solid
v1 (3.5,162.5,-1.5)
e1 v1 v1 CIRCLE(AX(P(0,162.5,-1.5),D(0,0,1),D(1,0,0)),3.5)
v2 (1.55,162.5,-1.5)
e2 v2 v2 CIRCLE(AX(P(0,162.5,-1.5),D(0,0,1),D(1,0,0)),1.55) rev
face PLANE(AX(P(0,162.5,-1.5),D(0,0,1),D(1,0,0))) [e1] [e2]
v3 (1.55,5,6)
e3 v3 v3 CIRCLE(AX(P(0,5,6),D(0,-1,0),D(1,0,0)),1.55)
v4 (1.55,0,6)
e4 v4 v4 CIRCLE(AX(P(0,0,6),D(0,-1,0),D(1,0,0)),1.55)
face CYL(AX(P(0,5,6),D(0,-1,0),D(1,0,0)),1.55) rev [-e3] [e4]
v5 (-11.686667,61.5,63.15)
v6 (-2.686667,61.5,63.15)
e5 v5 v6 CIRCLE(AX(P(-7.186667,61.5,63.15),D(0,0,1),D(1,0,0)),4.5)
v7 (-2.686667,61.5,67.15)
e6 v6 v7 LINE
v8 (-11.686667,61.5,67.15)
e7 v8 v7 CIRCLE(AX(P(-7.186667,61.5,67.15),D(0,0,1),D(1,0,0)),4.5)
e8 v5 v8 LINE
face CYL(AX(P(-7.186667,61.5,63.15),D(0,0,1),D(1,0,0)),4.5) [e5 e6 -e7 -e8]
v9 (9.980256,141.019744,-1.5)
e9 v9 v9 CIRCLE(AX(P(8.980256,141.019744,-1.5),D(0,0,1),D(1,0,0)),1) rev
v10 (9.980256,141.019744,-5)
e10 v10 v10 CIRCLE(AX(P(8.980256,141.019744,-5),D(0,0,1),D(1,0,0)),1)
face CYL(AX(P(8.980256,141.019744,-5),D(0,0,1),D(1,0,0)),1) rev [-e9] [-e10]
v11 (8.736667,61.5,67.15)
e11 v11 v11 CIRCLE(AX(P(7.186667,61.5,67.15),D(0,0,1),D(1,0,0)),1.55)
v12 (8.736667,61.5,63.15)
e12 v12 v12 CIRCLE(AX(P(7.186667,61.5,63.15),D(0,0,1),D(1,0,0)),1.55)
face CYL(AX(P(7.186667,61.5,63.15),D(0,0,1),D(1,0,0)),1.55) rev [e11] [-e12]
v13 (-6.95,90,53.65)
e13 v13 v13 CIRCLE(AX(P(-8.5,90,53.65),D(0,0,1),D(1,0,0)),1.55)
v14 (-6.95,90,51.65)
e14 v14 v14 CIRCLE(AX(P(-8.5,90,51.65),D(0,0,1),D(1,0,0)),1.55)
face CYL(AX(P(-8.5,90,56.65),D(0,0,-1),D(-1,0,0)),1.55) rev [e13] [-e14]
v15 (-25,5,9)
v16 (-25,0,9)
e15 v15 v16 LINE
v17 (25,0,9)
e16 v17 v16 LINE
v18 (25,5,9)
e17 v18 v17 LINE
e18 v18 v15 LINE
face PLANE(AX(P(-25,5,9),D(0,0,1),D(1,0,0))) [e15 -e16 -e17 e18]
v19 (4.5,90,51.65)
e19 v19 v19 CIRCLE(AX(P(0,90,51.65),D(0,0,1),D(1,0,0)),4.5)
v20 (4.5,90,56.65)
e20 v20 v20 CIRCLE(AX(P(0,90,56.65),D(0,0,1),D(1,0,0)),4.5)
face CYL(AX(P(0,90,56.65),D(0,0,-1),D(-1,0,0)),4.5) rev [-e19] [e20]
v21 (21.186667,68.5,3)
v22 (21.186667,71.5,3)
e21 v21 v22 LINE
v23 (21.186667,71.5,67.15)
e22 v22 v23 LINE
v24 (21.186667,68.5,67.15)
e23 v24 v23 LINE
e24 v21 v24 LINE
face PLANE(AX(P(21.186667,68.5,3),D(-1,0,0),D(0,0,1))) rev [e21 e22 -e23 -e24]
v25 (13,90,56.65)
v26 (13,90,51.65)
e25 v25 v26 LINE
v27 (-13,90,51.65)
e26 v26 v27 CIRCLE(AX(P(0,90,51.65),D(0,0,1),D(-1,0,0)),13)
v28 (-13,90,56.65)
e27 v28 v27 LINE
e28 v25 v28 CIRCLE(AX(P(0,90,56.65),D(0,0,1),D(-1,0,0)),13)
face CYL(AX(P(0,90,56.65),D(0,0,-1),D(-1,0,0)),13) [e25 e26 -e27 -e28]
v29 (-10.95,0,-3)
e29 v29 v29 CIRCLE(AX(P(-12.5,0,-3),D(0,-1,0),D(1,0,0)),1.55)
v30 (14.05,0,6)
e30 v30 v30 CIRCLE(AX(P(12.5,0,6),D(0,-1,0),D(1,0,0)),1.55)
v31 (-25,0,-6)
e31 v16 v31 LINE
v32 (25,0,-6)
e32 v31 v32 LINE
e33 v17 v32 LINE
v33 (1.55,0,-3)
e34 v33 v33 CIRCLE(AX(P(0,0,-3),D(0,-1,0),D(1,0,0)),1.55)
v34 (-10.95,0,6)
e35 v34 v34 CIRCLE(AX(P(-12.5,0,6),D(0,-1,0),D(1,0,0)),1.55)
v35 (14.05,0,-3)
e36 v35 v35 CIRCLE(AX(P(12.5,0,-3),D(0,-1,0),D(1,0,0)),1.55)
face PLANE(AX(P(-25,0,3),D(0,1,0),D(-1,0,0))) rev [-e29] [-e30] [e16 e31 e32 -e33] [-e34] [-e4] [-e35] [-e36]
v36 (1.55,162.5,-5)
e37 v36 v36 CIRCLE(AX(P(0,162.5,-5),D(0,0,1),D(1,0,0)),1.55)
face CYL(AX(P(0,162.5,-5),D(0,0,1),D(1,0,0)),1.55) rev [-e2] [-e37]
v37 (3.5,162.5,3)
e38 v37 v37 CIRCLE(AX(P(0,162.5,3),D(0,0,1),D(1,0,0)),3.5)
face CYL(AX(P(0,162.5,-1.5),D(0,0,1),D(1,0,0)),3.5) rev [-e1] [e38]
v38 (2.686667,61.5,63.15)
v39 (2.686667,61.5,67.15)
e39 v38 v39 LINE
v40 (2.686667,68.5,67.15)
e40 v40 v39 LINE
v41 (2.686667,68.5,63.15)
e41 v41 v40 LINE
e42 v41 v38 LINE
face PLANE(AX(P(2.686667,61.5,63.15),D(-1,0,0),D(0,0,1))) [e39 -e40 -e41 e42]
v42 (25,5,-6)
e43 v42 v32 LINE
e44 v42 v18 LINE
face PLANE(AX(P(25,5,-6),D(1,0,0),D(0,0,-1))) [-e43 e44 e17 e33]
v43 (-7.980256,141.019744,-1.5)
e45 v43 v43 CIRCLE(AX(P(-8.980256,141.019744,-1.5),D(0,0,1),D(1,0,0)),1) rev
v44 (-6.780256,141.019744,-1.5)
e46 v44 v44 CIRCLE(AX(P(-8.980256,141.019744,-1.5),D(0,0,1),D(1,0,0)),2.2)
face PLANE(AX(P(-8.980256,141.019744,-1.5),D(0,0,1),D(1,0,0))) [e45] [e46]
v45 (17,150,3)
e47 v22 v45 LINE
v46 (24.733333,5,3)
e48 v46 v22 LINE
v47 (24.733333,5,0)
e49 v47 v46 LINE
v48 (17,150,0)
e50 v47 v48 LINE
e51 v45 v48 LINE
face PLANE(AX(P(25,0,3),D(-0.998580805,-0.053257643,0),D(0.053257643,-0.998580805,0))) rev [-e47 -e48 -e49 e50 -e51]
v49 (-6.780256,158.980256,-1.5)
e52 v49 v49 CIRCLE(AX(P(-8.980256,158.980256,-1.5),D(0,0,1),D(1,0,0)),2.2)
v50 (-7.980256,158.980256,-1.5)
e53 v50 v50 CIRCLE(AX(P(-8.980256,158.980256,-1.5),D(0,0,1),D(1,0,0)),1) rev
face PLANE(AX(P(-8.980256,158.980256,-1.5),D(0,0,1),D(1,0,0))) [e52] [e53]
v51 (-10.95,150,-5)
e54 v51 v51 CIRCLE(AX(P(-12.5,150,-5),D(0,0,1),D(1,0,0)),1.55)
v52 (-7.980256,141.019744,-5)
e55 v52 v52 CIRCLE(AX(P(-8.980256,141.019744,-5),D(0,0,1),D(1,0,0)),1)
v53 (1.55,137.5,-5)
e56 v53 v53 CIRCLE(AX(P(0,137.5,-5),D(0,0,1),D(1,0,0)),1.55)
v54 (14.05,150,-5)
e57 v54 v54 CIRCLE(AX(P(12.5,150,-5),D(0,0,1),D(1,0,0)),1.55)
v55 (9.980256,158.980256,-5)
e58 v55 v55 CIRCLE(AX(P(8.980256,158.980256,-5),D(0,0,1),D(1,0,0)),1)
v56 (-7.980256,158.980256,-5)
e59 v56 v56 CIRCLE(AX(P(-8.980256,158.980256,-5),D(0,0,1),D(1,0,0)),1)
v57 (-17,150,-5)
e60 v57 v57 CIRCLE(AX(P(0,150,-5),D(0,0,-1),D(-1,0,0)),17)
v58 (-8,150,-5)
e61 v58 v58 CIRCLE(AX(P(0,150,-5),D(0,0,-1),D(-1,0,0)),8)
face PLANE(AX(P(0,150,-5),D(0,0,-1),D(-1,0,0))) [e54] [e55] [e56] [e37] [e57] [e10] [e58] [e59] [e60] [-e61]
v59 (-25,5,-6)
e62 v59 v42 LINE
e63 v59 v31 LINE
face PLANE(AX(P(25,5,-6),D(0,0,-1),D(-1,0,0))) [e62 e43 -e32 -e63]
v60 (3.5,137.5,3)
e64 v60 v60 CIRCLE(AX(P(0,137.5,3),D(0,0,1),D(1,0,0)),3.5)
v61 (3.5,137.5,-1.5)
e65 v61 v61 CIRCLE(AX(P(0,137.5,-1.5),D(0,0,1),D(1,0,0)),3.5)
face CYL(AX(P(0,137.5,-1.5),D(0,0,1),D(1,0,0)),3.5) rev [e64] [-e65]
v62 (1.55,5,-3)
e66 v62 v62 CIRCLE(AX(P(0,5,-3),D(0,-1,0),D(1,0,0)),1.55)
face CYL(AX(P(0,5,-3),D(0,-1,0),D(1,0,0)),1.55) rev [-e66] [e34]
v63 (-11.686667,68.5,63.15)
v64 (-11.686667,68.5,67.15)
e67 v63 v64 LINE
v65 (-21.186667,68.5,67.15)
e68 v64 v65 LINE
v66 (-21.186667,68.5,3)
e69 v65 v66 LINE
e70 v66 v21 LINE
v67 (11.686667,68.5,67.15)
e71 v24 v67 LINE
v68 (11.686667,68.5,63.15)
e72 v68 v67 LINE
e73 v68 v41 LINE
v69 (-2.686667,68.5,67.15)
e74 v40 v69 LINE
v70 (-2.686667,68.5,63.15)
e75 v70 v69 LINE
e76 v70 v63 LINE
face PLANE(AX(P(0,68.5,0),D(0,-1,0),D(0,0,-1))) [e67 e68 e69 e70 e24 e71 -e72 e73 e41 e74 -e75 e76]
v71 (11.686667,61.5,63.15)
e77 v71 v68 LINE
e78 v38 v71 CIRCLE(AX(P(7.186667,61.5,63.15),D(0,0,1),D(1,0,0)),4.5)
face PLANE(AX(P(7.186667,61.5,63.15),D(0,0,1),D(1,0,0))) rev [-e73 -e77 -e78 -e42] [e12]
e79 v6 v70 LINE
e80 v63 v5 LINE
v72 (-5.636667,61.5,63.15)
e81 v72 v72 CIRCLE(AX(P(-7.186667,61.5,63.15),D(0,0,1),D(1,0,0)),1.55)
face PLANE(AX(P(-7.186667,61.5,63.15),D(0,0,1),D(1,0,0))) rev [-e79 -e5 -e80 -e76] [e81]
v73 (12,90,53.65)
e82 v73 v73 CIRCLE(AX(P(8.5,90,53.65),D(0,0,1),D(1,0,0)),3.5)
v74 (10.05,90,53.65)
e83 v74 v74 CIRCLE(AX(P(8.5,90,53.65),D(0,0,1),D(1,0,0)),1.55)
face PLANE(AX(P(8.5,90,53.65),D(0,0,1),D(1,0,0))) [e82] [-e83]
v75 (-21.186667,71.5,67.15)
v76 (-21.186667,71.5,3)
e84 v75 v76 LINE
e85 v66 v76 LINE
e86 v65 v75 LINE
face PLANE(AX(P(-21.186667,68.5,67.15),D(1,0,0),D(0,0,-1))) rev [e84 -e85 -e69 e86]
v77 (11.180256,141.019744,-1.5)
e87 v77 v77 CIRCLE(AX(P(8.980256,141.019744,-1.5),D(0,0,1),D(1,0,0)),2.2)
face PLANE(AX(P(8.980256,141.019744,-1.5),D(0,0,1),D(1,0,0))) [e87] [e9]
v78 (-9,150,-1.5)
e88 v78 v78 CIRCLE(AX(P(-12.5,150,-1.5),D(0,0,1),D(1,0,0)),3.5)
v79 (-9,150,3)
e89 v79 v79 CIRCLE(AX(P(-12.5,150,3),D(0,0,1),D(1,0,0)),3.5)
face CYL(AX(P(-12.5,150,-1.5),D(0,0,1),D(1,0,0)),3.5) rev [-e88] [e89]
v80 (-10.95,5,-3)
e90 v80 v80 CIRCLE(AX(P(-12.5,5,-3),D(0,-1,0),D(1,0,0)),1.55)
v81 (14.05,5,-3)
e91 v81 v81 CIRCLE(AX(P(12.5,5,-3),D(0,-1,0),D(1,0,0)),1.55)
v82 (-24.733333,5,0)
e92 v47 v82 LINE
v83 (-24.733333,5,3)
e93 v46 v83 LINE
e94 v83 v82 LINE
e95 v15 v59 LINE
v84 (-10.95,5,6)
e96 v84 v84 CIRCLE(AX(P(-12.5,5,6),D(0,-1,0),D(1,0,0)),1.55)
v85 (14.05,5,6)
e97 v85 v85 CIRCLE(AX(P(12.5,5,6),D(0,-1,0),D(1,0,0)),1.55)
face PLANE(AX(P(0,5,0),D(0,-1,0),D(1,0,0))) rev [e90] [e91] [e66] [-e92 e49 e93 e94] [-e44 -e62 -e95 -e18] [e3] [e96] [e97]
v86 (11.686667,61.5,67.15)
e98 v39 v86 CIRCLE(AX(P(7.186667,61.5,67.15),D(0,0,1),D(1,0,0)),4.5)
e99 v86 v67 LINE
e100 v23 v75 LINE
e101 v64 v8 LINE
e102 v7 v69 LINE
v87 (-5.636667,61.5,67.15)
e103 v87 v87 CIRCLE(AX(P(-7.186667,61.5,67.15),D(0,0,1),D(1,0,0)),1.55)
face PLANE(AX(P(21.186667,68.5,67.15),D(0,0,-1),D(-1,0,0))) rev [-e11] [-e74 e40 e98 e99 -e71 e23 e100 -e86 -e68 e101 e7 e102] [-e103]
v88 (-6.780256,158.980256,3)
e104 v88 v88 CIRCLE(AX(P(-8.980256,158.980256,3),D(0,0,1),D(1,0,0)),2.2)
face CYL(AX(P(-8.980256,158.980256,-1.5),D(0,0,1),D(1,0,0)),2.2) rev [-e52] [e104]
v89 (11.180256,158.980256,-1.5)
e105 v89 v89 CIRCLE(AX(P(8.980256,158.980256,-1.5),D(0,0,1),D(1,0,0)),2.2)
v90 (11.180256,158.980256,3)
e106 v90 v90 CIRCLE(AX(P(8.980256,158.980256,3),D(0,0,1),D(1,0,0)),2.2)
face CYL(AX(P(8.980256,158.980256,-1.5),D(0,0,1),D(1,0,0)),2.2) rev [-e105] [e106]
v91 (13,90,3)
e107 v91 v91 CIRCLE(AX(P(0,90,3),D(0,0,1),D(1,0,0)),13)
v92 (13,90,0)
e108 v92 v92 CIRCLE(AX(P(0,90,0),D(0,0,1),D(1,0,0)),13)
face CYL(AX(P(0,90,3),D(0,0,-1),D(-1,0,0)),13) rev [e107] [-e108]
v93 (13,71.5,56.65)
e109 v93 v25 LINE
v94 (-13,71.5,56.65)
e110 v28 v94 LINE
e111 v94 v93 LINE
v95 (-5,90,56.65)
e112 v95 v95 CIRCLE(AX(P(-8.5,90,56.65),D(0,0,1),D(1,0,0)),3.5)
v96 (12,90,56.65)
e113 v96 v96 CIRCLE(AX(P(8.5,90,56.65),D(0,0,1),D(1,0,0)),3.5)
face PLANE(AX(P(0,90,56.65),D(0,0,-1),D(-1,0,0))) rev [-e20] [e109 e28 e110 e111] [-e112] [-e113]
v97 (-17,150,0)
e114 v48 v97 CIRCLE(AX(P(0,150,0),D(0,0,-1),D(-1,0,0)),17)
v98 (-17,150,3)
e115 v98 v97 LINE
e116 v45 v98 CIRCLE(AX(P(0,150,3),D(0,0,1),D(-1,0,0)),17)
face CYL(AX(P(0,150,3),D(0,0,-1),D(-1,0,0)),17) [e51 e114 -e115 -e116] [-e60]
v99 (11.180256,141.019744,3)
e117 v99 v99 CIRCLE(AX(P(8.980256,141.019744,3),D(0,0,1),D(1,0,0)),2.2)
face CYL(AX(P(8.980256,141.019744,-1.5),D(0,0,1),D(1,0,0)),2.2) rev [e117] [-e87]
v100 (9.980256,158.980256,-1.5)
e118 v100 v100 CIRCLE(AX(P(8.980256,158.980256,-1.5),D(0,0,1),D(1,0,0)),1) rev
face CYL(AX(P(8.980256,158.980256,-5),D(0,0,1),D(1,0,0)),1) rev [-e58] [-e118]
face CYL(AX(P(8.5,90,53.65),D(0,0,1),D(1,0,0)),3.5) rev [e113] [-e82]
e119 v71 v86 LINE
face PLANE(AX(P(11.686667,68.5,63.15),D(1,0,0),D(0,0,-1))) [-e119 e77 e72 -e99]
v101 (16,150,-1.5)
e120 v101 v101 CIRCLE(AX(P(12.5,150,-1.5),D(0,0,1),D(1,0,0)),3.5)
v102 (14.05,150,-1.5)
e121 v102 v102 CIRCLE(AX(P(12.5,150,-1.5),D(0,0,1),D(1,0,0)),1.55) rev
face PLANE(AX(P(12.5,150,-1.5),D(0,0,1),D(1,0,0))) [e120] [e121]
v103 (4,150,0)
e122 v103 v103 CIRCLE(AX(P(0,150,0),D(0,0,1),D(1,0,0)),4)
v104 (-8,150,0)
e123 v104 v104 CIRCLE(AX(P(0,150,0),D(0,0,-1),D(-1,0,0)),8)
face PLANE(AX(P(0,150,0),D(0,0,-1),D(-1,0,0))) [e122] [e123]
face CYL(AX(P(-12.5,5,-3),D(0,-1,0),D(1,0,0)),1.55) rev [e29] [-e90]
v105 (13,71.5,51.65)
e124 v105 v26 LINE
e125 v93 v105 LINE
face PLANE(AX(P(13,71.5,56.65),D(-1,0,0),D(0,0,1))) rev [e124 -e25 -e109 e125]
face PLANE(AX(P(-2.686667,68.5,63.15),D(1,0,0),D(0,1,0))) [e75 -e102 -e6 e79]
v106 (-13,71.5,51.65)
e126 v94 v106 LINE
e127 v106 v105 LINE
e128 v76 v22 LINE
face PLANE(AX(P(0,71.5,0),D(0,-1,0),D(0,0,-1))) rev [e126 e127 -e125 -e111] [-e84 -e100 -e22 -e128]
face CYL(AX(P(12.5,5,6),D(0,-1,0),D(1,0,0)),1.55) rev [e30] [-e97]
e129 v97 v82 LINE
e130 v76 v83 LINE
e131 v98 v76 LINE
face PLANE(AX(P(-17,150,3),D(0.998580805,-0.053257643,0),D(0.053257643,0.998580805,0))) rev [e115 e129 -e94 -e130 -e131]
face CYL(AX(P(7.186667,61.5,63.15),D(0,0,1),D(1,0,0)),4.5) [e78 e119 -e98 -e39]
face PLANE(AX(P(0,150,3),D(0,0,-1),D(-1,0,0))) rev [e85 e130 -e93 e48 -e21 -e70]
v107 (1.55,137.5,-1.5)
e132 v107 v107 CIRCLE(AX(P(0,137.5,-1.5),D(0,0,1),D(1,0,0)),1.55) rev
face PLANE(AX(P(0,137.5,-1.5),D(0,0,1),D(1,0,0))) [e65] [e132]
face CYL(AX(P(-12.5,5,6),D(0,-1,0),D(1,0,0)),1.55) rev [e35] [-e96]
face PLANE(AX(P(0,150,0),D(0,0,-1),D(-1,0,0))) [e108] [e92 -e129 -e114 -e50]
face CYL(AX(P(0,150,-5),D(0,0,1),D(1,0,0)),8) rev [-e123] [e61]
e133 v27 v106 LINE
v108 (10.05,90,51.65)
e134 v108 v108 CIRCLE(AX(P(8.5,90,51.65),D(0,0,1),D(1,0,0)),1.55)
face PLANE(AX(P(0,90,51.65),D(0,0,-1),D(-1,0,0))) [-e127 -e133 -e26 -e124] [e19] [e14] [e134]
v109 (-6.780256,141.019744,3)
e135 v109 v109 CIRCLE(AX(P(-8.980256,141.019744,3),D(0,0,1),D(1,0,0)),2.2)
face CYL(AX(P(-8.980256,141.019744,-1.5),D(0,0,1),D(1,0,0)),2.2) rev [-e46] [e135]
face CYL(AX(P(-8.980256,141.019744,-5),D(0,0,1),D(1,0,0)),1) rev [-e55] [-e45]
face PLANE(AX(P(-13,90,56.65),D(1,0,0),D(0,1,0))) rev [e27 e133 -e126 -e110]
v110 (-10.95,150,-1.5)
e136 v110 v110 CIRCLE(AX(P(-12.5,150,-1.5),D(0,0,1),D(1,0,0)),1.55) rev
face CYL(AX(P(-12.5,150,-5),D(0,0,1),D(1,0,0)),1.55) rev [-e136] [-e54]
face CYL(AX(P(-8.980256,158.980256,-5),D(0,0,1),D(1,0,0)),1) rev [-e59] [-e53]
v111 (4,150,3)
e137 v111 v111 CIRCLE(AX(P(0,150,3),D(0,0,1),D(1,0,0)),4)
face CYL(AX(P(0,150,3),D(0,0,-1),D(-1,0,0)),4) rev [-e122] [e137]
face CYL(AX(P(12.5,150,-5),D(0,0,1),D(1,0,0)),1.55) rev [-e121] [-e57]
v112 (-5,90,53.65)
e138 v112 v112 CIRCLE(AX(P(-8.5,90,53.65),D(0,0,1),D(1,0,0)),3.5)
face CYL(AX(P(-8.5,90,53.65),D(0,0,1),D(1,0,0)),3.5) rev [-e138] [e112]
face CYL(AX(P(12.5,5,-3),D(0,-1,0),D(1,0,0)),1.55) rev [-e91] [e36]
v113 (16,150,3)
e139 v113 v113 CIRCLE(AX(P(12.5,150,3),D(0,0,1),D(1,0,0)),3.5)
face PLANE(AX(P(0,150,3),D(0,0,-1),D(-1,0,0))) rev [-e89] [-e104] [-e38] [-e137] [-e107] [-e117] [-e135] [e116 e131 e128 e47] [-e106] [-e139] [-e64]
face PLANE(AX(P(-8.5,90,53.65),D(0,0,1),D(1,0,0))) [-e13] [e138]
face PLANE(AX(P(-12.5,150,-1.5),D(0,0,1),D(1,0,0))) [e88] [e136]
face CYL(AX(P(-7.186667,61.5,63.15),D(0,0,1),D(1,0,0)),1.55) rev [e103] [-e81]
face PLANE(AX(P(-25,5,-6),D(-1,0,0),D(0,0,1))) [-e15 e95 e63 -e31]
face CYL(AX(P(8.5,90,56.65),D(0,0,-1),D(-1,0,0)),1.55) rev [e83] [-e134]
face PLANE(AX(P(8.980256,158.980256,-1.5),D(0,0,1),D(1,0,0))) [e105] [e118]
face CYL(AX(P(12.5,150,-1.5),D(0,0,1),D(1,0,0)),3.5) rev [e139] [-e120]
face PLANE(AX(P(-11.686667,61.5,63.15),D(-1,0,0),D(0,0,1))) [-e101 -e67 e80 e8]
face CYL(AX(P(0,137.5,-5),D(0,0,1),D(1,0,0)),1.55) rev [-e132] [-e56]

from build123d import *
from build123d.topology import SkipClean

# Parameters (mm, degrees)
SKETCH1_R           = 4
SKETCH1_R_2         = 13
BOSS_EXTRUDE1_DEPTH = 3
BOSS_EXTRUDE2_START = 5
SKETCH2_R           = 17
SKETCH2_R_2         = 8
BOSS_EXTRUDE2_DEPTH = 5
SKETCH3_R           = 1.55
SKETCH3_R_2         = 1
CUT_EXTRUDE1_DEPTH  = 8
SKETCH4_R           = 3.5
SKETCH4_R_2         = 2.2
CUT_EXTRUDE2_DEPTH  = 4.5
SKETCH5_W           = 50
SKETCH5_H           = 15
SKETCH5_R           = 1.55
BOSS_EXTRUDE3_DEPTH = 5
SKETCH9_W           = 42.373333334
SKETCH9_H           = 64.15
BOSS_EXTRUDE6_DEPTH = 3
SKETCH11_R          = 1.55
SKETCH11_R_2        = 4.5
BOSS_EXTRUDE7_DEPTH = 5
SKETCH12_R          = 1.55
BOSS_EXTRUDE8_DEPTH = 4
SKETCH13_R          = 3.5
CUT_EXTRUDE3_DEPTH  = 3


with BuildPart() as part:
    # Sketch1 → Boss-Extrude1 (new body)
    with BuildSketch(Plane.XY):
        with BuildLine():
            Line((-25, 0), (25, 0))
            Line((25, 0), (17, 150))
            ThreePointArc((17, 150), (0, 167), (-17, 150))
            Line((-17, 150), (-25, 0))
        make_face()
        with Locations((0, 150)):
            Circle(SKETCH1_R, mode=Mode.SUBTRACT)
        with Locations((0, 90)):
            Circle(SKETCH1_R_2, mode=Mode.SUBTRACT)
    extrude(amount=BOSS_EXTRUDE1_DEPTH)

    # Sketch2 → Boss-Extrude2 (add)
    with SkipClean():  # the faces are left unmerged after this step: merging them gives an invalid solid
        with BuildSketch(Plane(origin=(0, 0, 0), x_dir=(-1, 0, 0), z_dir=(0, 0, -1)).offset(BOSS_EXTRUDE2_START)):
            with Locations((0, 150)):
                Circle(SKETCH2_R)
            with Locations((0, 150)):
                Circle(SKETCH2_R_2, mode=Mode.SUBTRACT)
        extrude(amount=-BOSS_EXTRUDE2_DEPTH)

    # Sketch3 → Cut-Extrude1 (cut)
    with SkipClean():  # the faces are left unmerged after this step: merging them gives an invalid solid
        with BuildSketch(Plane.XY.offset(3)):
            with Locations((-12.5, 150)):
                Circle(SKETCH3_R)
            with Locations((0, 162.5)):
                Circle(SKETCH3_R)
            with Locations((12.5, 150)):
                Circle(SKETCH3_R)
            with Locations((0, 137.5)):
                Circle(SKETCH3_R)
            with Locations((8.980256121, 158.980256121)):
                Circle(SKETCH3_R_2)
            with Locations((8.980256121, 141.019743879)):
                Circle(SKETCH3_R_2)
            with Locations((-8.980256121, 141.019743879)):
                Circle(SKETCH3_R_2)
            with Locations((-8.980256121, 158.980256121)):
                Circle(SKETCH3_R_2)
        extrude(amount=-CUT_EXTRUDE1_DEPTH, mode=Mode.SUBTRACT)

    # Sketch4 → Cut-Extrude2 (cut)
    with SkipClean():  # the faces are left unmerged after this step: merging them gives an invalid solid
        with BuildSketch(Plane.XY.offset(3)):
            with Locations((-12.5, 150)):
                Circle(SKETCH4_R)
            with Locations((0, 162.5)):
                Circle(SKETCH4_R)
            with Locations((12.5, 150)):
                Circle(SKETCH4_R)
            with Locations((0, 137.5)):
                Circle(SKETCH4_R)
            with Locations((-8.980256121, 158.980256121)):
                Circle(SKETCH4_R_2)
            with Locations((8.980256121, 158.980256121)):
                Circle(SKETCH4_R_2)
            with Locations((8.980256121, 141.019743879)):
                Circle(SKETCH4_R_2)
            with Locations((-8.980256121, 141.019743879)):
                Circle(SKETCH4_R_2)
        extrude(amount=-CUT_EXTRUDE2_DEPTH, mode=Mode.SUBTRACT)

    # Sketch5 → Boss-Extrude3 (add)
    with SkipClean():  # the faces are left unmerged after this step: merging them gives an invalid solid
        with BuildSketch(Plane.XZ):
            with Locations((0, 1.5)):
                Rectangle(SKETCH5_W, SKETCH5_H)
            with Locations((-12.5, 6)):
                Circle(SKETCH5_R, mode=Mode.SUBTRACT)
            with Locations((0, 6)):
                Circle(SKETCH5_R, mode=Mode.SUBTRACT)
            with Locations((12.5, 6)):
                Circle(SKETCH5_R, mode=Mode.SUBTRACT)
            with Locations((0, -3)):
                Circle(SKETCH5_R, mode=Mode.SUBTRACT)
            with Locations((-12.5, -3)):
                Circle(SKETCH5_R, mode=Mode.SUBTRACT)
            with Locations((12.5, -3)):
                Circle(SKETCH5_R, mode=Mode.SUBTRACT)
        extrude(amount=-BOSS_EXTRUDE3_DEPTH)

    # Sketch9 → Boss-Extrude6 (add)
    with SkipClean():  # the faces are left unmerged after this step: merging them gives an invalid solid
        with BuildSketch(Plane.XZ.offset(-71.5)):
            with Locations((0, 35.075)):
                Rectangle(SKETCH9_W, SKETCH9_H)
        extrude(amount=BOSS_EXTRUDE6_DEPTH)

    # Sketch11 → Boss-Extrude7 (add)
    with SkipClean():  # the faces are left unmerged after this step: merging them gives an invalid solid
        with BuildSketch(Plane.XY.offset(51.65)):
            with BuildLine():
                Line((-13, 90), (-13, 71.5))
                Line((-13, 71.5), (13, 71.5))
                Line((13, 71.5), (13, 90))
                ThreePointArc((13, 90), (0, 103), (-13, 90))
            make_face()
            with Locations((-8.5, 90)):
                Circle(SKETCH11_R, mode=Mode.SUBTRACT)
            with Locations((8.5, 90)):
                Circle(SKETCH11_R, mode=Mode.SUBTRACT)
            with Locations((0, 90)):
                Circle(SKETCH11_R_2, mode=Mode.SUBTRACT)
        extrude(amount=BOSS_EXTRUDE7_DEPTH)

    # Sketch12 → Boss-Extrude8 (add)
    # profile 1 of 2: a face of its own
    with SkipClean():  # the faces are left unmerged after this step: merging them gives an invalid solid
        with BuildSketch(Plane.XY.offset(67.15)):
            with BuildLine():
                Line((-11.686666667, 61.5), (-11.686666667, 68.5))
                Line((-11.686666667, 68.5), (-2.686666667, 68.5))
                Line((-2.686666667, 68.5), (-2.686666667, 61.5))
                ThreePointArc((-2.686666667, 61.5), (-7.186666667, 57), (-11.686666667, 61.5))
            make_face()
            with Locations((-7.186666667, 61.5)):
                Circle(SKETCH12_R, mode=Mode.SUBTRACT)
        # profile 2 of 2: a face of its own
        with BuildSketch(Plane.XY.offset(67.15)):
            with BuildLine():
                Line((2.686666667, 61.5), (2.686666667, 68.5))
                Line((2.686666667, 68.5), (11.686666667, 68.5))
                Line((11.686666667, 68.5), (11.686666667, 61.5))
                ThreePointArc((11.686666667, 61.5), (7.186666667, 57), (2.686666667, 61.5))
            make_face()
            with Locations((7.186666667, 61.5)):
                Circle(SKETCH12_R, mode=Mode.SUBTRACT)
        extrude(amount=-BOSS_EXTRUDE8_DEPTH)

    # Sketch13 → Cut-Extrude3 (cut)
    with SkipClean():  # the faces are left unmerged after this step: merging them gives an invalid solid
        with BuildSketch(Plane.XY.offset(56.65)):
            with Locations((-8.5, 90)):
                Circle(SKETCH13_R)
            with Locations((8.5, 90)):
                Circle(SKETCH13_R)
        extrude(amount=-CUT_EXTRUDE3_DEPTH, mode=Mode.SUBTRACT)


solid = part.part
